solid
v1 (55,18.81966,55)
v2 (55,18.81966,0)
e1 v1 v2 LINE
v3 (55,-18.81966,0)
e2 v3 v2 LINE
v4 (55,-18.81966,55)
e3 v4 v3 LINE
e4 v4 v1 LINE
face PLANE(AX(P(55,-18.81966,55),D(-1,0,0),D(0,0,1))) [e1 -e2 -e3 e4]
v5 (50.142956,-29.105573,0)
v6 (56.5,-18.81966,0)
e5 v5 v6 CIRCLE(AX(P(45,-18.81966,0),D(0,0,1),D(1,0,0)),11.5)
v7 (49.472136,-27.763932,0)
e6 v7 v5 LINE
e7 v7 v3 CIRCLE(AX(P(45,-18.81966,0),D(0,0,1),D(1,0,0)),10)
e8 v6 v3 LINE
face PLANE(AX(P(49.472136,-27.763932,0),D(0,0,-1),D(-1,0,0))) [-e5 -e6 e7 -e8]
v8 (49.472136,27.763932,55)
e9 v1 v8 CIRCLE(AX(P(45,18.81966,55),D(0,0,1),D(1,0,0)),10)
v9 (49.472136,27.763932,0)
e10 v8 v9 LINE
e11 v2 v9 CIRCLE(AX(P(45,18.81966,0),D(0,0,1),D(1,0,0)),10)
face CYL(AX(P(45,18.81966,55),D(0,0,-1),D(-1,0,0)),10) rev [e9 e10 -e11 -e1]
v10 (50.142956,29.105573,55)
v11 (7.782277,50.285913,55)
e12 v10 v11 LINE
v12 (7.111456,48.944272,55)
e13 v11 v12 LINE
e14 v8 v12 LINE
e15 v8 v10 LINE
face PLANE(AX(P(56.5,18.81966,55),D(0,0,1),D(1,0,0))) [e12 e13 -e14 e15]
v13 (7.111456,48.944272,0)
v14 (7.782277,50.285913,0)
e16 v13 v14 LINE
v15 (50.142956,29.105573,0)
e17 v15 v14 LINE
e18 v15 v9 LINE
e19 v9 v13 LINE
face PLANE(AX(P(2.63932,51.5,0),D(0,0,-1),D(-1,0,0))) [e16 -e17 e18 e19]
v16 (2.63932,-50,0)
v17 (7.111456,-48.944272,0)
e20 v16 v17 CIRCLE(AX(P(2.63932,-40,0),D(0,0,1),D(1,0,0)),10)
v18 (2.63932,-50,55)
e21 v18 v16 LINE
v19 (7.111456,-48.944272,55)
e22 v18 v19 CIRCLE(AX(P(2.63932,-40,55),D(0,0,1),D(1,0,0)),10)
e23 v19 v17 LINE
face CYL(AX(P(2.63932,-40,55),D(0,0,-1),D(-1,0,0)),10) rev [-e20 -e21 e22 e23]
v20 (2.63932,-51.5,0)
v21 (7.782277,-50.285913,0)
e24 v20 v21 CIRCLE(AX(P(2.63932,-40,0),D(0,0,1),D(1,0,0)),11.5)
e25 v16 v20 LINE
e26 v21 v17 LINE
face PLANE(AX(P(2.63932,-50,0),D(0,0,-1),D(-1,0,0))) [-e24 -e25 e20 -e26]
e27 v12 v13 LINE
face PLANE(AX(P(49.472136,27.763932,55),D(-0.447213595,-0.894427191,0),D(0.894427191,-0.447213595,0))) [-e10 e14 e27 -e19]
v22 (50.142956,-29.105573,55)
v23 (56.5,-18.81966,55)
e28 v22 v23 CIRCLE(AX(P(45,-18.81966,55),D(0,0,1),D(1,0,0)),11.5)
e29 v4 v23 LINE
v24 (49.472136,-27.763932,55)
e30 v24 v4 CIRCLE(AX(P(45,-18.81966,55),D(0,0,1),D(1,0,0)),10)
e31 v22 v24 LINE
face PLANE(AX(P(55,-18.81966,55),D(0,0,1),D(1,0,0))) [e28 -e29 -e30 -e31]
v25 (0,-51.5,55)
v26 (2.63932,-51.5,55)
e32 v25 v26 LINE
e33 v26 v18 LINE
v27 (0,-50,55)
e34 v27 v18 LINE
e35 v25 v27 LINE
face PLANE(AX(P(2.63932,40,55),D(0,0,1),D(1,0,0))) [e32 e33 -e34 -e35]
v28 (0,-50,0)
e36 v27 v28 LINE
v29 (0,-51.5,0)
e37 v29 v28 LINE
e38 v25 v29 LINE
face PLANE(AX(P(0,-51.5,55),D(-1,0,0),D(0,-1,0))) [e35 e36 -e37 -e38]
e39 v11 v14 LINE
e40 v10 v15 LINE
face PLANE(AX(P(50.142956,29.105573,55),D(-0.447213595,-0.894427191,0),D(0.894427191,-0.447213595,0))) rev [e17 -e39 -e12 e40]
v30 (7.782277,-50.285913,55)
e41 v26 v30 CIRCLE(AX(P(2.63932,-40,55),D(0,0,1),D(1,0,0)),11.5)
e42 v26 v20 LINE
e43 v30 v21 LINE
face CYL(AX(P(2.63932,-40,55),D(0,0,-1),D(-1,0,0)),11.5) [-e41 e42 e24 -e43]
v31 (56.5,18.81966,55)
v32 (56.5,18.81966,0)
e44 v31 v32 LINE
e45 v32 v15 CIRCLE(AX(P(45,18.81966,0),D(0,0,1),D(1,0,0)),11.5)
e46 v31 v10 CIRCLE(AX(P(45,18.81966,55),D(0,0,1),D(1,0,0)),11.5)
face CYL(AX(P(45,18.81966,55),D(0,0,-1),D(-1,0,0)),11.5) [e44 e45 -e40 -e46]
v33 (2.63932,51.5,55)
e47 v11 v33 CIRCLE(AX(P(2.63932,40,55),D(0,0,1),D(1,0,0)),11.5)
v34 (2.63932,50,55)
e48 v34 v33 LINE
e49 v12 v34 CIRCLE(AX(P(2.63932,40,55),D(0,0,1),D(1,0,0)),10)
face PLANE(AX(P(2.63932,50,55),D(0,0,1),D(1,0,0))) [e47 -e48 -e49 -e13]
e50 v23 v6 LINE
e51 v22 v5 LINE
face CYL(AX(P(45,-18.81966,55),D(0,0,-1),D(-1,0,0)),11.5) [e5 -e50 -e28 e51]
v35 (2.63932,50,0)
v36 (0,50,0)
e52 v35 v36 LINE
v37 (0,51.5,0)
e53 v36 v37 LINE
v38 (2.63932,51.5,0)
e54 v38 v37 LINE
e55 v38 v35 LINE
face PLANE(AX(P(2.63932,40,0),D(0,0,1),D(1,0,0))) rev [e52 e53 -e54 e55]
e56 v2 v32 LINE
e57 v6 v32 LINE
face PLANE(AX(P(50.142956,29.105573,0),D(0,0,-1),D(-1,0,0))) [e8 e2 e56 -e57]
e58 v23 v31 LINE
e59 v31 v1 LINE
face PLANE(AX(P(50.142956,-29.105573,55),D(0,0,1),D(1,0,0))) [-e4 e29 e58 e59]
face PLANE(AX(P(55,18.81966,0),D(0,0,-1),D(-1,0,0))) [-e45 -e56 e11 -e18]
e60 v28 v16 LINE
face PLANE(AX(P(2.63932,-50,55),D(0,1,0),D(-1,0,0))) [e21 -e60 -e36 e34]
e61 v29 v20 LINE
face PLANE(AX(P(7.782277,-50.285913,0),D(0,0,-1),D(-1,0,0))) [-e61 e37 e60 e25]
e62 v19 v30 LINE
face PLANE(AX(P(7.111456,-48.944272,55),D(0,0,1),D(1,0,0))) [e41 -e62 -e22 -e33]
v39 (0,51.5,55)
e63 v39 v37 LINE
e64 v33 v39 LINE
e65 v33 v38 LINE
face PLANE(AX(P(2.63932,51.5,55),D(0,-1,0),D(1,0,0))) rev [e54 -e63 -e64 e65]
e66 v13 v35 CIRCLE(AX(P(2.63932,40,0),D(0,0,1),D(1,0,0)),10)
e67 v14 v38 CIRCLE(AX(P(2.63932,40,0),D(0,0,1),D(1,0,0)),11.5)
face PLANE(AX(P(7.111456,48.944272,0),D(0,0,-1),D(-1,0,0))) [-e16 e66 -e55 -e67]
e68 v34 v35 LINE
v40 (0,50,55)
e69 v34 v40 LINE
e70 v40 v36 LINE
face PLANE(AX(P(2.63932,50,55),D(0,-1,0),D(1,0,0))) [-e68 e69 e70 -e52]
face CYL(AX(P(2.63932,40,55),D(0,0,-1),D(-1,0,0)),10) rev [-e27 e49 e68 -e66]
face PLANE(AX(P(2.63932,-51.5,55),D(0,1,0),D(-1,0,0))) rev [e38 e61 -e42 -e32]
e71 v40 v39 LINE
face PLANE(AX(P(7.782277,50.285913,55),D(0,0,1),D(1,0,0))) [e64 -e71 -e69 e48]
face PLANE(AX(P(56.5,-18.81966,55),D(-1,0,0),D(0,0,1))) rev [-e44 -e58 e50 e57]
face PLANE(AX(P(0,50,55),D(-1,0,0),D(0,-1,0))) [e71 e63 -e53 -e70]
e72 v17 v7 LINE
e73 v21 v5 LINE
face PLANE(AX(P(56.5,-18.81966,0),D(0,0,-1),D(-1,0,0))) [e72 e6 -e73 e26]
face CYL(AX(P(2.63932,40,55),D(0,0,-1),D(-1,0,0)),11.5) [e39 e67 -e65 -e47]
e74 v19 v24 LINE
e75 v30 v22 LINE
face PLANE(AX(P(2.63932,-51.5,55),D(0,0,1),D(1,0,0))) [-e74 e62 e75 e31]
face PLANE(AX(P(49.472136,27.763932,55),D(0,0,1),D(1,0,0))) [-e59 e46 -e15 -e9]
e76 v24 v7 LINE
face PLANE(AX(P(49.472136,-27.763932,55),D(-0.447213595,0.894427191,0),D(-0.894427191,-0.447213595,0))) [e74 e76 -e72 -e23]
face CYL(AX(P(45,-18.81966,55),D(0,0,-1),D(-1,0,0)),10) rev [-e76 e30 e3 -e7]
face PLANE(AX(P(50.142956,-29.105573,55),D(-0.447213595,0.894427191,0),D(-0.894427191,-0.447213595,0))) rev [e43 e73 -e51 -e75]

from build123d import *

# Parameters (mm, degrees)
BASE_FLANGE1_DEPTH = 55


# Sheet-metal steps are written as plain solids
with BuildPart() as part:
    # Sketch1 → Base-Flange1 (new body)
    with BuildSketch(Plane.XY):
        with BuildLine():
            Line((0, -50), (2.639320225, -50))
            ThreePointArc((2.639320225, -50), (4.93684943, -49.732489895), (7.11145618, -48.94427191))
            Line((7.11145618, -48.94427191), (49.472135955, -27.763932023))
            ThreePointArc((49.472135955, -27.763932023), (53.506508084, -24.076971234), (55, -18.819660113))
            Line((55, -18.819660113), (55, 18.819660113))
            ThreePointArc((55, 18.819660113), (53.506508084, 24.076971234), (49.472135955, 27.763932023))
            Line((49.472135955, 27.763932023), (7.11145618, 48.94427191))
            ThreePointArc((7.11145618, 48.94427191), (4.93684943, 49.732489895), (2.639320225, 50))
            Line((2.639320225, 50), (0, 50))
            Line((0, 50), (0, 51.5))
            Line((0, 51.5), (2.639320225, 51.5))
            ThreePointArc((2.639320225, 51.5), (5.281478811, 51.192363379), (7.782276573, 50.285912696))
            Line((7.782276573, 50.285912696), (50.142956348, 29.105572809))
            ThreePointArc((50.142956348, 29.105572809), (54.782484296, 24.865567902), (56.5, 18.819660113))
            Line((56.5, 18.819660113), (56.5, -18.819660113))
            ThreePointArc((56.5, -18.819660113), (54.782484296, -24.865567902), (50.142956348, -29.105572809))
            Line((50.142956348, -29.105572809), (7.782276573, -50.285912696))
            ThreePointArc((7.782276573, -50.285912696), (5.281478811, -51.192363379), (2.639320225, -51.5))
            Line((2.639320225, -51.5), (0, -51.5))
            Line((0, -51.5), (0, -50))
        make_face()
    extrude(amount=BASE_FLANGE1_DEPTH)


solid = part.part
